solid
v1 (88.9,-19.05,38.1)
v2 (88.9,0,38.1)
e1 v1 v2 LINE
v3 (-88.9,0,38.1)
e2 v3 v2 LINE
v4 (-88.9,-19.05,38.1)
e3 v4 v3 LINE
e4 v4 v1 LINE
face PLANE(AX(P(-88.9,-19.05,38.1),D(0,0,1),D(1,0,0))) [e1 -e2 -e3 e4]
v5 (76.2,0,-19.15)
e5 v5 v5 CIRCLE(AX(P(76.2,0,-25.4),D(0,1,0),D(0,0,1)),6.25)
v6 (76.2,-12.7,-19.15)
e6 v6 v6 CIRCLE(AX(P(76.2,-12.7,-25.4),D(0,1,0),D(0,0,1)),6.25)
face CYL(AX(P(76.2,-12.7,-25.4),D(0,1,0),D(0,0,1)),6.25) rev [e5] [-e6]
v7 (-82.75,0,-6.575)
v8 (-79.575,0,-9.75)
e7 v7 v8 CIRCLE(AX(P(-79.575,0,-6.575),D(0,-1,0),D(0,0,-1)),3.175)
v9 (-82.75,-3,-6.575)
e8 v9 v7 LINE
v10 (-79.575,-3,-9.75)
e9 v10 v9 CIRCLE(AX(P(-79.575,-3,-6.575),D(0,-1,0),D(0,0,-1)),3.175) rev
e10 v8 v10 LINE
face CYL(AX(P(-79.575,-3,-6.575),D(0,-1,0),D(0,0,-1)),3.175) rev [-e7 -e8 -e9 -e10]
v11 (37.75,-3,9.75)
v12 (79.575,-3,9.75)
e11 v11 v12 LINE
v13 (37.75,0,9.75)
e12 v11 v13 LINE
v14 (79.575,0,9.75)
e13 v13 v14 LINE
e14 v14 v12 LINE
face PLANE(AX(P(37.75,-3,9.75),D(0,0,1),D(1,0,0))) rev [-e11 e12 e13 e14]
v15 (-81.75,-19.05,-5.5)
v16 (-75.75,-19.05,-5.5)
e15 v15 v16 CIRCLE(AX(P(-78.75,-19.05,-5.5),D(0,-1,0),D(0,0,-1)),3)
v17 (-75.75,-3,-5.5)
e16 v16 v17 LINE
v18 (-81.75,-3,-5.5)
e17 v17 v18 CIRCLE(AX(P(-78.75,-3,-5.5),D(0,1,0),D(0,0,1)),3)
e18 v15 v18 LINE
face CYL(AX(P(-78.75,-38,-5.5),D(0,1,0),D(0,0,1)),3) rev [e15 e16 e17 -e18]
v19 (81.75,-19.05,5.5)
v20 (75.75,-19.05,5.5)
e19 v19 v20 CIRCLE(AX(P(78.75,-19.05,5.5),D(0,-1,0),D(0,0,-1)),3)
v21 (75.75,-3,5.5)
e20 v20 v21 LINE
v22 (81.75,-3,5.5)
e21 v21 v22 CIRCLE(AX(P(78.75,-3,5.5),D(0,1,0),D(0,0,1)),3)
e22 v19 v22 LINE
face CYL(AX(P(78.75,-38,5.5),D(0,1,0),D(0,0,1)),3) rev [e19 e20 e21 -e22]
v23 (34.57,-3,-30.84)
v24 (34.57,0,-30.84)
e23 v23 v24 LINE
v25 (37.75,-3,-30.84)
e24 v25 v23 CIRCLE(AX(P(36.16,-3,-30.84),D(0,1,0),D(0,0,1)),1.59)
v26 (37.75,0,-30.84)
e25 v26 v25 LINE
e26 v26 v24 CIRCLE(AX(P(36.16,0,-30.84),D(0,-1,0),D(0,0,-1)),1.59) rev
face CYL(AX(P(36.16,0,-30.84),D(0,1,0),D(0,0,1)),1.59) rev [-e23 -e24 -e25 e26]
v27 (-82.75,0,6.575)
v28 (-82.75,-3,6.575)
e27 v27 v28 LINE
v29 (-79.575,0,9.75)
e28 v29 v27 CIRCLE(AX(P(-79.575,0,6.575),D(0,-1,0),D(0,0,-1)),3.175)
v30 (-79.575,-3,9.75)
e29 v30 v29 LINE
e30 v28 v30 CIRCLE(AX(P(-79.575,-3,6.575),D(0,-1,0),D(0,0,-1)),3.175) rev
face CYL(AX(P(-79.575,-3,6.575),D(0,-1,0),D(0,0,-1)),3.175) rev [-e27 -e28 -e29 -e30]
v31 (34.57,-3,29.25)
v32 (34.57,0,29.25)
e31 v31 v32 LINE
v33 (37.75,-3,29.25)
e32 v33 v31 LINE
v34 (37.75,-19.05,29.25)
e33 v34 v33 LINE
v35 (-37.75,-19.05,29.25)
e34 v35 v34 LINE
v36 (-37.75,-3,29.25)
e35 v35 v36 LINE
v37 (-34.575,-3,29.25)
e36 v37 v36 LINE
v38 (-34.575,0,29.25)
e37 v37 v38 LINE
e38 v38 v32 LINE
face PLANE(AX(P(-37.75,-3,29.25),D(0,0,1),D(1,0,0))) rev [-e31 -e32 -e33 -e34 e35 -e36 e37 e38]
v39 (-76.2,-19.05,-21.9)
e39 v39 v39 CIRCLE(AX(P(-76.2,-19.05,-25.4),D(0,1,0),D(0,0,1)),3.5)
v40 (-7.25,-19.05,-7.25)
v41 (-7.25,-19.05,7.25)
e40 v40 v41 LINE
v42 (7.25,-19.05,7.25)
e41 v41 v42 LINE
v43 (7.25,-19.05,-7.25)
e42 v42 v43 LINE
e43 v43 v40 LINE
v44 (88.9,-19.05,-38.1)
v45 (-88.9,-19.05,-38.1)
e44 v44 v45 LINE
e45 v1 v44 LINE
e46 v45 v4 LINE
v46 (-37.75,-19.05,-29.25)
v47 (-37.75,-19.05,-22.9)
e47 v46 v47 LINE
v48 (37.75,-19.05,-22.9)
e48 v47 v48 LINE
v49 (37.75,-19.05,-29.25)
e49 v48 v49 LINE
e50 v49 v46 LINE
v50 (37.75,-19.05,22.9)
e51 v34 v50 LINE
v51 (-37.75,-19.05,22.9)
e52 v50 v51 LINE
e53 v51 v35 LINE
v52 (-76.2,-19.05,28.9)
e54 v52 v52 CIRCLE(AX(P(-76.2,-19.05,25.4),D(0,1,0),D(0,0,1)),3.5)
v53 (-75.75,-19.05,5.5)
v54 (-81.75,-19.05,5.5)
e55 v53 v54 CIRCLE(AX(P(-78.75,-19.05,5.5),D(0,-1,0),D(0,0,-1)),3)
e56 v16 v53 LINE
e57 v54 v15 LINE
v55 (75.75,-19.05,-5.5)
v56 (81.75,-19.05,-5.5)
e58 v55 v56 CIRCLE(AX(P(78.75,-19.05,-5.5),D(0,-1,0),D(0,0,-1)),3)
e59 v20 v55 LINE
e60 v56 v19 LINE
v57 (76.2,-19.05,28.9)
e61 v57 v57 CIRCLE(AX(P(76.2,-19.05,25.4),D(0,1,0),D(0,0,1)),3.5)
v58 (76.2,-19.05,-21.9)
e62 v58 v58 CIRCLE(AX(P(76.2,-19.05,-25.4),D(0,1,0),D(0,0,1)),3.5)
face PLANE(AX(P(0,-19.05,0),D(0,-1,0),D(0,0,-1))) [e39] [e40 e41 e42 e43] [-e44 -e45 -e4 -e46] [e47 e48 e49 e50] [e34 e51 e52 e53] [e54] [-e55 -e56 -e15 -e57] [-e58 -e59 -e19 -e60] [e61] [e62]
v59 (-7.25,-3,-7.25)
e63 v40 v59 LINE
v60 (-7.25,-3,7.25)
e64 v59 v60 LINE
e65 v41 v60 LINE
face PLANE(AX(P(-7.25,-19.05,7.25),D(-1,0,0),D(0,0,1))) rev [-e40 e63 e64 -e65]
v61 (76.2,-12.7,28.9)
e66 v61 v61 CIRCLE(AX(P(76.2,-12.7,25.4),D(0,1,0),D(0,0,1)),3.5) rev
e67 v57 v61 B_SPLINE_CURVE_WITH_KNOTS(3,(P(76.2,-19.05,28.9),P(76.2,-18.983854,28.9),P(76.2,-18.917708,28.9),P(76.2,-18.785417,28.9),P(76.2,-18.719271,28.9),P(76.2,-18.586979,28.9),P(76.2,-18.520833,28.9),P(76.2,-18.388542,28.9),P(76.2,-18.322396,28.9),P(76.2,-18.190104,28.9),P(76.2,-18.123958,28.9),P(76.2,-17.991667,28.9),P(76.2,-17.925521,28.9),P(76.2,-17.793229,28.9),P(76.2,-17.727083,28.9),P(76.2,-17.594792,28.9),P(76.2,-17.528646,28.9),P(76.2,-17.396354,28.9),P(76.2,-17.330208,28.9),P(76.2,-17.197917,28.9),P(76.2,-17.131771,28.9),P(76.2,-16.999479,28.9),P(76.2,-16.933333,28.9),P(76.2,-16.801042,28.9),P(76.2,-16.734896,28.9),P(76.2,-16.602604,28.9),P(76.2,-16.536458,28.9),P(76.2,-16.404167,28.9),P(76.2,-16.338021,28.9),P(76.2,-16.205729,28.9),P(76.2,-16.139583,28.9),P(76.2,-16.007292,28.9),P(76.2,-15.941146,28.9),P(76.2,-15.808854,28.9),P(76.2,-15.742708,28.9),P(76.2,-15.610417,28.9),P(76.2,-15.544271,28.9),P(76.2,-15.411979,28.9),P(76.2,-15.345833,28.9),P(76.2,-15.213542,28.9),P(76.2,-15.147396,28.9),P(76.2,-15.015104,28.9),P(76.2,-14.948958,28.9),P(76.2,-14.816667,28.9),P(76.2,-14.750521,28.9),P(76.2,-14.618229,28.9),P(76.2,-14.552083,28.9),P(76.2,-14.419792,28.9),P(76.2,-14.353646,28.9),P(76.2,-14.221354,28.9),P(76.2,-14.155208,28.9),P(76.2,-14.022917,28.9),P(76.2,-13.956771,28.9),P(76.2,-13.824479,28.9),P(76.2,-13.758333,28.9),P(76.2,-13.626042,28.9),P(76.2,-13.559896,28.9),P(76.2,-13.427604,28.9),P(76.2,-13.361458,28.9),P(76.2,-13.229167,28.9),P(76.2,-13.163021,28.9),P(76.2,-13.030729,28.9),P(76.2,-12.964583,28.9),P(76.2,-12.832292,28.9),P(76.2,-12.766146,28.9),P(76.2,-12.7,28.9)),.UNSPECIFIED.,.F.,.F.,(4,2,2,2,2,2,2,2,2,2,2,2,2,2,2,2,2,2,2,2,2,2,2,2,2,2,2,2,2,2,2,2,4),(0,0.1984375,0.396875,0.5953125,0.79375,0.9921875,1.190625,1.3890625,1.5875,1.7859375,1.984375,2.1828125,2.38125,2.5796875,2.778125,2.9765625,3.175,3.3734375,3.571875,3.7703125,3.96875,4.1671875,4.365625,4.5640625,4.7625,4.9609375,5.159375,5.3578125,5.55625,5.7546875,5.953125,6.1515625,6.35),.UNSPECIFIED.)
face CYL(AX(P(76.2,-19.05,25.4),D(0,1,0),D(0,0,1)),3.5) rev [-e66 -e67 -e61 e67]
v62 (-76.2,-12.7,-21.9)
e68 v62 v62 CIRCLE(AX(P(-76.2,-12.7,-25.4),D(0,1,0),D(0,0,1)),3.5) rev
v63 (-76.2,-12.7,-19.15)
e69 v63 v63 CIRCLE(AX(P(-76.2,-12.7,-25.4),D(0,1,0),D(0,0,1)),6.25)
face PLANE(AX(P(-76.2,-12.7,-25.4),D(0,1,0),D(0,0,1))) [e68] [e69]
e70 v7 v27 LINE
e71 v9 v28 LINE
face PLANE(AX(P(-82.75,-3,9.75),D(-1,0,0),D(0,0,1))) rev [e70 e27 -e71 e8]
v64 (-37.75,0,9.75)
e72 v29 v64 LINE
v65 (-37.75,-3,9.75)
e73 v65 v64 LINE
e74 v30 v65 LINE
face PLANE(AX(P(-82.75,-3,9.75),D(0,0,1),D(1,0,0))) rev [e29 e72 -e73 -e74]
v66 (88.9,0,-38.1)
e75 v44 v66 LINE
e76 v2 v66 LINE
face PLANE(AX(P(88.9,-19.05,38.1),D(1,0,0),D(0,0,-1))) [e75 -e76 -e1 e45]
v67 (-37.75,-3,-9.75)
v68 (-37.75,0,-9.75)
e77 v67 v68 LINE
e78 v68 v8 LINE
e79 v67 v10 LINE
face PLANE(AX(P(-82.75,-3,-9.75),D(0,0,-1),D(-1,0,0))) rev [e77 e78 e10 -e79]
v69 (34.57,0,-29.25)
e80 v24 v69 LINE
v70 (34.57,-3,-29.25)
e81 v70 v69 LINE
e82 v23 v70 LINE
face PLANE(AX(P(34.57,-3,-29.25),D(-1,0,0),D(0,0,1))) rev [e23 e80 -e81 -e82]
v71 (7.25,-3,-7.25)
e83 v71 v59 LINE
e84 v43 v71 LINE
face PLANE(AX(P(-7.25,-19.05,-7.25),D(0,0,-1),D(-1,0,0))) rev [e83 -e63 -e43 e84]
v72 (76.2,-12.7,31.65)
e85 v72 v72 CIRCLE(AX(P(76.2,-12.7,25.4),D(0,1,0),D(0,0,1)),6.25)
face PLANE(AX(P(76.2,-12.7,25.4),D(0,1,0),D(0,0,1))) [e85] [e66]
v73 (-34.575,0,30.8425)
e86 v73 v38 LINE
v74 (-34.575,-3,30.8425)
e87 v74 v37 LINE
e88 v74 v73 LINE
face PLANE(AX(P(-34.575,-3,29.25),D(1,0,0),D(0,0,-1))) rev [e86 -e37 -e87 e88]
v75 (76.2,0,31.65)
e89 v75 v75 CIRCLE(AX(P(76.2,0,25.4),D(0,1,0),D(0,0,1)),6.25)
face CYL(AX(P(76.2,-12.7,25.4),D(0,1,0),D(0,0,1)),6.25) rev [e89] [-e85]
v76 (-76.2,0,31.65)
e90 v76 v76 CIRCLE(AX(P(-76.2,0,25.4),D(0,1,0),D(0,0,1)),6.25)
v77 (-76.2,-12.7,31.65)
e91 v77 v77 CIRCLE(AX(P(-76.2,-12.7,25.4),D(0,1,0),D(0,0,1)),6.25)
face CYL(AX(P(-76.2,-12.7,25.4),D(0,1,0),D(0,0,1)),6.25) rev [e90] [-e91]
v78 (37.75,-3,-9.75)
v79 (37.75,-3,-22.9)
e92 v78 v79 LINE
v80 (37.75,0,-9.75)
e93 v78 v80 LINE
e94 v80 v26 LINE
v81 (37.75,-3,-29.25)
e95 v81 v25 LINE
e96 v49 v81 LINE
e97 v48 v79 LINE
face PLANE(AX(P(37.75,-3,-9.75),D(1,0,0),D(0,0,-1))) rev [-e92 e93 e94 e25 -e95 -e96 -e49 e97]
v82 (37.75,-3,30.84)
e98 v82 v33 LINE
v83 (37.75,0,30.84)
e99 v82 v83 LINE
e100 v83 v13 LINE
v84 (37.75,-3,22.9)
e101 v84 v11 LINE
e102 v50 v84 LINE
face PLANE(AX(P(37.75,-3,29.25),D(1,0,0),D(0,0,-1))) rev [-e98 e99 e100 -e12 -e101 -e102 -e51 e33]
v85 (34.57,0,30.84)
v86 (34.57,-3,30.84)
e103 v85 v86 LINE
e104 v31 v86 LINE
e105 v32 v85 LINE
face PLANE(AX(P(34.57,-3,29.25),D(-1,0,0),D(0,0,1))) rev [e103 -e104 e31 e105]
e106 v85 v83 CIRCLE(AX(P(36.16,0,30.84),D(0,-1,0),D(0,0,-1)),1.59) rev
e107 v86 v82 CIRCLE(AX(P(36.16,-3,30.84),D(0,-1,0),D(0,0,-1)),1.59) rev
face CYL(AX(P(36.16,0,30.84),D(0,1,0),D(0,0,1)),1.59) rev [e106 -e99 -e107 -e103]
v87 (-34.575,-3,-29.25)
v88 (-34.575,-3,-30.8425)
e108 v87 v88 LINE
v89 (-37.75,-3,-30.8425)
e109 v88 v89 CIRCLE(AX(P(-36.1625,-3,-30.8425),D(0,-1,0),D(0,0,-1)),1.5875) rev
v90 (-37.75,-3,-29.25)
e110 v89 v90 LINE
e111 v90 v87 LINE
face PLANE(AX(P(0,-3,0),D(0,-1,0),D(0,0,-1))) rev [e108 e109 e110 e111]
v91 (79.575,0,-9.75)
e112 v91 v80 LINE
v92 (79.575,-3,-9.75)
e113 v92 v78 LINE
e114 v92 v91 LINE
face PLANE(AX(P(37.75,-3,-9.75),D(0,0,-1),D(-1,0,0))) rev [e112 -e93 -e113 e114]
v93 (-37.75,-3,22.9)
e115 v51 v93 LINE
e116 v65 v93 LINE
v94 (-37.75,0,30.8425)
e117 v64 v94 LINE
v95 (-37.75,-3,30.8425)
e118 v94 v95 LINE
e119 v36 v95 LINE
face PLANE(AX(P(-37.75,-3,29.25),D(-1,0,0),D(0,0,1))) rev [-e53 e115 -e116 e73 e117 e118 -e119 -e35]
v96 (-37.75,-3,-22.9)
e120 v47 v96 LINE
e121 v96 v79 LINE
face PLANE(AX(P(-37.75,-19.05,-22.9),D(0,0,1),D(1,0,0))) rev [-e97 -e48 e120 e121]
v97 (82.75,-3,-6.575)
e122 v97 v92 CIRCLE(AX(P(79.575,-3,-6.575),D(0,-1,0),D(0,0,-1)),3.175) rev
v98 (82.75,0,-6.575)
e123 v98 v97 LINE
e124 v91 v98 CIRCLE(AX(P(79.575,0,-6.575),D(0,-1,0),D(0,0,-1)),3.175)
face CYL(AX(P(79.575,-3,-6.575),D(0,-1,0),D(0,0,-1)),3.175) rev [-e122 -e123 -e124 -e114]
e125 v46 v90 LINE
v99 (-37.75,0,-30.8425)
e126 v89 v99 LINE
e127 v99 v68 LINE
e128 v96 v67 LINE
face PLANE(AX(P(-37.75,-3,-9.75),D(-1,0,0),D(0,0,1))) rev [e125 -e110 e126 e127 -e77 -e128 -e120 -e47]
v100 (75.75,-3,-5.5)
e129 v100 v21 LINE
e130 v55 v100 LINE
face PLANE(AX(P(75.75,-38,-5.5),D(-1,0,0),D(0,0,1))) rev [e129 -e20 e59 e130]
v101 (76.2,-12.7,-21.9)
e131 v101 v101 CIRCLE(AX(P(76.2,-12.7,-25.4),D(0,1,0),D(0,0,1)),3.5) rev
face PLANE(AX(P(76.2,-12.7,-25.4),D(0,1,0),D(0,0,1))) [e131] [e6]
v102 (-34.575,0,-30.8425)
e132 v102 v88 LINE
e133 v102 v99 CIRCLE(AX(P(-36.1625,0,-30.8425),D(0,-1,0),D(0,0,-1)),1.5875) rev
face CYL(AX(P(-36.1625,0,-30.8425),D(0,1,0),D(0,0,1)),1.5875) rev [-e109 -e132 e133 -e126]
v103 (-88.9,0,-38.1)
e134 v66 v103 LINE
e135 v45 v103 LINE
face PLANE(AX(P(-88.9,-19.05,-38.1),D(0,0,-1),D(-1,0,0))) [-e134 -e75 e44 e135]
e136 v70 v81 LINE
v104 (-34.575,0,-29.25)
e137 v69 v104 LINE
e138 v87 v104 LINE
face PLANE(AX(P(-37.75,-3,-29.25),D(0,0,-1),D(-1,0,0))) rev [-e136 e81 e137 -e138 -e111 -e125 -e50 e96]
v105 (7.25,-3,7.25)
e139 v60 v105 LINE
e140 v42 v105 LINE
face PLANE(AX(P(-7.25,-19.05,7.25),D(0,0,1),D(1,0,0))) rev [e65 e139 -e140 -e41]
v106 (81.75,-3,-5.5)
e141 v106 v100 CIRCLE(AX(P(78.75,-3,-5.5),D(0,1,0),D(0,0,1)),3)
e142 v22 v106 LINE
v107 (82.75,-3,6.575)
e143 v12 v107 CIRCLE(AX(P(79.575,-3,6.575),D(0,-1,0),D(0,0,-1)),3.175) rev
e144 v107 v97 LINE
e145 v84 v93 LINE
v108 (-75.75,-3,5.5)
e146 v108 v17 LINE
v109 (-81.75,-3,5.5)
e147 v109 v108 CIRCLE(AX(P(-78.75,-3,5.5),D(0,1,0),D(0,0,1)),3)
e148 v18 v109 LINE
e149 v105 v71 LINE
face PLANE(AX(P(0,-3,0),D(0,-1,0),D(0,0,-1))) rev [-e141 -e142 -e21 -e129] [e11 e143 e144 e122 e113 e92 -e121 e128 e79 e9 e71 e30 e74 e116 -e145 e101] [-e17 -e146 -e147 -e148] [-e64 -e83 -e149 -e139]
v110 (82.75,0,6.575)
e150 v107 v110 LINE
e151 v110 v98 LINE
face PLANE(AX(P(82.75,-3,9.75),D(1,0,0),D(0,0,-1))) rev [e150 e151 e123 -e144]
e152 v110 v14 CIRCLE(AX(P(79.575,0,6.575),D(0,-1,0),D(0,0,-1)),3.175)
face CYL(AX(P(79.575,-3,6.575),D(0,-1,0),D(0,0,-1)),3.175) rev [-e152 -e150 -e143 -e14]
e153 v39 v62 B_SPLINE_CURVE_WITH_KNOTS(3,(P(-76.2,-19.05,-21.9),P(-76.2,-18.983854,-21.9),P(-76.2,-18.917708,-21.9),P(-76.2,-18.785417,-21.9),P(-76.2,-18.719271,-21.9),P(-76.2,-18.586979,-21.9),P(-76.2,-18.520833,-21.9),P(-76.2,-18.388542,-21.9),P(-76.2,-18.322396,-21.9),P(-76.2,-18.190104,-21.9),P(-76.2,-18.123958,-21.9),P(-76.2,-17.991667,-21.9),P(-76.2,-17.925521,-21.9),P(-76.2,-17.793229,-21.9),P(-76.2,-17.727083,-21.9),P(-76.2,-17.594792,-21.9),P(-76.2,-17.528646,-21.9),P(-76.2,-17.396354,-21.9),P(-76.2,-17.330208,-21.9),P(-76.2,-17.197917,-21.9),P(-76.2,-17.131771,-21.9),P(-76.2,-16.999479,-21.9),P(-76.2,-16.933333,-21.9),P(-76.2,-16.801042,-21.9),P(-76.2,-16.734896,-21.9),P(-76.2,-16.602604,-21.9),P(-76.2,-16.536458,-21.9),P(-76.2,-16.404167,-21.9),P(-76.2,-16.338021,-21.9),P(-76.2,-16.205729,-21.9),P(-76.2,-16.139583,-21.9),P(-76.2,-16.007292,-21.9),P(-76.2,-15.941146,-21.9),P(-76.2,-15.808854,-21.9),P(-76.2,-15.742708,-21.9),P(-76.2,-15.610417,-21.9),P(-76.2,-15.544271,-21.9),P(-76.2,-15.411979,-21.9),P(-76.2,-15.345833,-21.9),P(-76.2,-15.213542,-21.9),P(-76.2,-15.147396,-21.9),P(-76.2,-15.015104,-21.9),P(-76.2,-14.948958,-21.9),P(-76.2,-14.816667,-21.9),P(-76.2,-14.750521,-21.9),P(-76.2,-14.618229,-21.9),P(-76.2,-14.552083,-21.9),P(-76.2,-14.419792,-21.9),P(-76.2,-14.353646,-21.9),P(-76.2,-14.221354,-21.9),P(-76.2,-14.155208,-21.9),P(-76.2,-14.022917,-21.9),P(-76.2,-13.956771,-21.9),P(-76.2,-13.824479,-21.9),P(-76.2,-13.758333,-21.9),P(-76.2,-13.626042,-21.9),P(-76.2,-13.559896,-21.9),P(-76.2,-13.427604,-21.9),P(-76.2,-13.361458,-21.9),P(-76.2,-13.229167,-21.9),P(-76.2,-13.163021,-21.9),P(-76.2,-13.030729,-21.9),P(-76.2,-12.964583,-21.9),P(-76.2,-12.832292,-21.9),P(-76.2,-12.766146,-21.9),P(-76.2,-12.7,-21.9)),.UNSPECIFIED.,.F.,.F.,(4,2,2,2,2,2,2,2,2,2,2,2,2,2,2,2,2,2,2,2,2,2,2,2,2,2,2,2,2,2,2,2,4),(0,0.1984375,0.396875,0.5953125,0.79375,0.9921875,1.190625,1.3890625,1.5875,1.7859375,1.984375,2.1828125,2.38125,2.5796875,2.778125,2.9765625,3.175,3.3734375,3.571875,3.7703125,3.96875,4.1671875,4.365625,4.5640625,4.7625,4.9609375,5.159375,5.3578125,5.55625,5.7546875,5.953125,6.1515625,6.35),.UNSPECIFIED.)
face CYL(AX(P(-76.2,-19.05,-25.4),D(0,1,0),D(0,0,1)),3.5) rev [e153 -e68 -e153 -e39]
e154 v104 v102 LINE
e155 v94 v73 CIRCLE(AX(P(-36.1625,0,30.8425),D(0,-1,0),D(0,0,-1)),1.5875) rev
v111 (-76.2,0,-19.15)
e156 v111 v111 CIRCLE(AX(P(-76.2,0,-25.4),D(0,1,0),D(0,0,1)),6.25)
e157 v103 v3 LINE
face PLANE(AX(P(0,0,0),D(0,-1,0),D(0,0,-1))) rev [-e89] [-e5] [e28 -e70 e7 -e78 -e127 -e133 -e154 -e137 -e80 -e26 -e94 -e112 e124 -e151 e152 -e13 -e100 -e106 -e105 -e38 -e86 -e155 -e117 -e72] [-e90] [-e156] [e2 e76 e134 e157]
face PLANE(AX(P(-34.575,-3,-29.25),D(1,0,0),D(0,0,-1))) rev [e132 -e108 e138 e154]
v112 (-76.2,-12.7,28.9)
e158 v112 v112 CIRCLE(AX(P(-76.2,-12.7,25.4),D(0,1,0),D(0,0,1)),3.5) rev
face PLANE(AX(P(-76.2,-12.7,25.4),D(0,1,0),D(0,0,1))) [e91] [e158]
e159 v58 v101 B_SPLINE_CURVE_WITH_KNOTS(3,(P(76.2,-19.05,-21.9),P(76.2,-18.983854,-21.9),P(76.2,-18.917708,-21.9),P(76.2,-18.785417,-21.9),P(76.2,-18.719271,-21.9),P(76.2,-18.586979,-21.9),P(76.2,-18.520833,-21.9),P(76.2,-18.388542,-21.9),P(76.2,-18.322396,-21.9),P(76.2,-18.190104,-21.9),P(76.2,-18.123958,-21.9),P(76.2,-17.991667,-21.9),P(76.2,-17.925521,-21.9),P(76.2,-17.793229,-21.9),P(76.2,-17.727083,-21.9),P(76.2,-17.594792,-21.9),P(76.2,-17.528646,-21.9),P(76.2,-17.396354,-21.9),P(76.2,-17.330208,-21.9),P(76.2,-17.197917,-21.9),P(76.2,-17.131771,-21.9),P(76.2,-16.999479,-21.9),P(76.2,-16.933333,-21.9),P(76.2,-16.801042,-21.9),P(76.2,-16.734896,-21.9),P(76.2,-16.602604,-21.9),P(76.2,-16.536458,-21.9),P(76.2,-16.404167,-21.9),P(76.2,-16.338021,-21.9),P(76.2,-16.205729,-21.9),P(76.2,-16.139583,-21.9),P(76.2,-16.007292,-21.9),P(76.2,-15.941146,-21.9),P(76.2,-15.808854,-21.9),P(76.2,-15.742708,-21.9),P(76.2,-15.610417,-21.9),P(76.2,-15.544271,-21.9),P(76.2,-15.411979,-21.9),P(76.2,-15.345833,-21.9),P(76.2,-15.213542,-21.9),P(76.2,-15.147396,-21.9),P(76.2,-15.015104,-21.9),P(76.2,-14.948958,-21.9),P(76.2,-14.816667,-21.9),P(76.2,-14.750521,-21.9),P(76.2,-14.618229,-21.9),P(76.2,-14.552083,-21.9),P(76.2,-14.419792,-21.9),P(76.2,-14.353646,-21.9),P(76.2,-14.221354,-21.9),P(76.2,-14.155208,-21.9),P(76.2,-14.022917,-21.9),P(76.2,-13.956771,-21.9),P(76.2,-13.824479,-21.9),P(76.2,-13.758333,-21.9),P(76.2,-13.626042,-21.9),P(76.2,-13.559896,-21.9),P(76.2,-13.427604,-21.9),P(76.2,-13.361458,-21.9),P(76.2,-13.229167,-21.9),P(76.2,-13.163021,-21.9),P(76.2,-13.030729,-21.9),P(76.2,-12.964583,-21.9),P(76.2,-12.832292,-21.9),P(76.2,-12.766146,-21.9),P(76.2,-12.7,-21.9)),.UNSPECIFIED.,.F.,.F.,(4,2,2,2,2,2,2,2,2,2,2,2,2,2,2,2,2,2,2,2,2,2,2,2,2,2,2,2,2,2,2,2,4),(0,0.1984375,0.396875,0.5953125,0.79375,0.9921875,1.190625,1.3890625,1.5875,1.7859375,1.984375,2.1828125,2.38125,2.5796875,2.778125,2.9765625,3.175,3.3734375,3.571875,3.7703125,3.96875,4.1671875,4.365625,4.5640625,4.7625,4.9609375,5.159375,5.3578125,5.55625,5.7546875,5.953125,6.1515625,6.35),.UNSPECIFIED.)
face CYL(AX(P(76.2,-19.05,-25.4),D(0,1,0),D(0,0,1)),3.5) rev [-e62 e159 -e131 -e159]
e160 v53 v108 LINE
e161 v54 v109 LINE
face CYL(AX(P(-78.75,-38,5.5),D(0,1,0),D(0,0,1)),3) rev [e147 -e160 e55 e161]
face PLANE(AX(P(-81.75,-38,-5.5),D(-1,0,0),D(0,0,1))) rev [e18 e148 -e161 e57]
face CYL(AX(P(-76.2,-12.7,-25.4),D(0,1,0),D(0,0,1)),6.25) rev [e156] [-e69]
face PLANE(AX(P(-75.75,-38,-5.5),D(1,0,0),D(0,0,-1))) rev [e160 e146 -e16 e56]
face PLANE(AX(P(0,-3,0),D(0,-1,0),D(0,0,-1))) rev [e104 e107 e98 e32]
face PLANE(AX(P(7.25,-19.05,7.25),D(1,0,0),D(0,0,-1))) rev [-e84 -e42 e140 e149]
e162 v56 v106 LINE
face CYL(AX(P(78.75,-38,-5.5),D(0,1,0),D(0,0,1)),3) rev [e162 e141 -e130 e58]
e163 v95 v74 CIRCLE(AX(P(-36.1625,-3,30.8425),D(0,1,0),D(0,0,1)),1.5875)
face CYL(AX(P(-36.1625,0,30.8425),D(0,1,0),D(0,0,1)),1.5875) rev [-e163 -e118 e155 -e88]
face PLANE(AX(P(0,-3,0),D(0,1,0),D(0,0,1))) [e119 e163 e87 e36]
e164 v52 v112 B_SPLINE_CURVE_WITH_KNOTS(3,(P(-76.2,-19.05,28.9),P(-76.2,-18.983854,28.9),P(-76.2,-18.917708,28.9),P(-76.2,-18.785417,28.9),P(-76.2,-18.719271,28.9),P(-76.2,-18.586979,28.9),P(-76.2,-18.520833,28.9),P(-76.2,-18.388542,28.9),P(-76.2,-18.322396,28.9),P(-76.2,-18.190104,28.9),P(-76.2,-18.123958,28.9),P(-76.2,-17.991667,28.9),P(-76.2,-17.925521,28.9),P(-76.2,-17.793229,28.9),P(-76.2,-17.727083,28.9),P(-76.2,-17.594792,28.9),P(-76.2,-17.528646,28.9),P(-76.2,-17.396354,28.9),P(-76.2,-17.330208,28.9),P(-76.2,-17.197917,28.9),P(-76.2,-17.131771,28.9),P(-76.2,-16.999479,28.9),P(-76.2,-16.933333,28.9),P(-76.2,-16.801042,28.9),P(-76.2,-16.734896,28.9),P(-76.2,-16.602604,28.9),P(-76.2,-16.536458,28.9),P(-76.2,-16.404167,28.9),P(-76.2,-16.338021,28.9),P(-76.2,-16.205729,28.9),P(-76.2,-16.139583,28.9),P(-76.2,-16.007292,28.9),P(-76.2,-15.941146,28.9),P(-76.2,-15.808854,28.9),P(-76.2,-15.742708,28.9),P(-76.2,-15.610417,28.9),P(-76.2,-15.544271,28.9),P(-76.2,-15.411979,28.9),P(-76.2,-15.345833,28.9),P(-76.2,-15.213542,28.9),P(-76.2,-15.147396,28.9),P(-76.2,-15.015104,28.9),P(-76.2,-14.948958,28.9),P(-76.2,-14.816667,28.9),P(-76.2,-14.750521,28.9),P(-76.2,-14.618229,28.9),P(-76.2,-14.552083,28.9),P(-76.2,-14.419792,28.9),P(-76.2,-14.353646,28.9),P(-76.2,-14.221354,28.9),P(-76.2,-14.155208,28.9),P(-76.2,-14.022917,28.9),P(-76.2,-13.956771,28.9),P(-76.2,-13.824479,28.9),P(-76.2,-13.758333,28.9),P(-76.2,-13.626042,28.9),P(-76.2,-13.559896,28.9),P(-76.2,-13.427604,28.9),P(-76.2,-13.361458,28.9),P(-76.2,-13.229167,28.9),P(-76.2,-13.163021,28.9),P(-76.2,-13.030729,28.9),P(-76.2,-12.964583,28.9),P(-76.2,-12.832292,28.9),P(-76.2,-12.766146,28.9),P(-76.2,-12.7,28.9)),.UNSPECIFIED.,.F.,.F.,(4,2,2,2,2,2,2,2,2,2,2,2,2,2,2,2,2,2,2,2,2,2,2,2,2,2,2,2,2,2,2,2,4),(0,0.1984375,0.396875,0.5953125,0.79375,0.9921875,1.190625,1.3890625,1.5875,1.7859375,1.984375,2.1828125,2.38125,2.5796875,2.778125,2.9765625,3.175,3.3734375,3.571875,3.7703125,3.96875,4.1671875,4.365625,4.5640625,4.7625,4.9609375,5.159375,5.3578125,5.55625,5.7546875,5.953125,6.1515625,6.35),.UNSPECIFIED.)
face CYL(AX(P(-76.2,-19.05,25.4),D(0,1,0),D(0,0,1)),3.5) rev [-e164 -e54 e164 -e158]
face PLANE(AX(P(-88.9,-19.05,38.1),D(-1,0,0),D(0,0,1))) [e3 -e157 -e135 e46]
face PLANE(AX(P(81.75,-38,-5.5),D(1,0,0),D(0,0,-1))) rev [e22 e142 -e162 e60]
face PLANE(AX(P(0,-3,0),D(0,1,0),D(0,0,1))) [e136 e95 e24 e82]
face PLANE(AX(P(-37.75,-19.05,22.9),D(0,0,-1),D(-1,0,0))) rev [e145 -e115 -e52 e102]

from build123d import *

# Parameters (mm, degrees)
SKETCH1_W           = 177.8
SKETCH1_H           = 76.2
BOSS_EXTRUDE1_DEPTH = 19.05
CUT_EXTRUDE1_DEPTH  = 3
SKETCH3_W           = 14.5
SKETCH3_H           = 14.5
SKETCH3_W_2         = 75.5
SKETCH3_H_2         = 6.35
CUT_EXTRUDE2_DEPTH  = 99.042962522
SKETCH4_R           = 3.5
CUT_EXTRUDE3_DEPTH  = 99.578509321
FILLET1_R           = 3.175
SKETCH5_R           = 6.25
CUT_EXTRUDE4_DEPTH  = 12.7
SKETCH6_W           = 3.175
SKETCH6_H           = 3.18
SKETCH6_W_2         = 3.18
CUT_EXTRUDE5_DEPTH  = 3
FILLET2_R           = 1.5875
FILLET3_R           = 1.59
FILLET4_R           = 1.5875
FILLET5_R           = 1.59
CUT_EXTRUDE6_DEPTH  = 35
CUT_EXTRUDE7_DEPTH  = 35


with BuildPart() as part:
    # Sketch1 → Boss-Extrude1 (new body)
    with BuildSketch(Plane(origin=(0, 0, 0), x_dir=(1, 0, 0), z_dir=(0, 1, 0))):
        Rectangle(SKETCH1_W, SKETCH1_H)
    extrude(amount=-BOSS_EXTRUDE1_DEPTH)

    # Sketch2 → Cut-Extrude1 (cut)
    with BuildSketch(Plane(origin=(0, 0, 0), x_dir=(1, 0, 0), z_dir=(0, 1, 0))):
        Polygon((37.75, 9.75), (82.75, 9.75), (82.75, -9.75), (37.75, -9.75), (37.75, -29.25), (-37.75, -29.25), (-37.75, -9.75), (-82.75, -9.75), (-82.75, 9.75), (-37.75, 9.75), (-37.75, 29.25), (37.75, 29.25), align=None)
    extrude(amount=-CUT_EXTRUDE1_DEPTH, mode=Mode.SUBTRACT)

    # Sketch3 → Cut-Extrude2 (cut, through all)
    with BuildSketch(Plane(origin=(0, -3, 0), x_dir=(1, 0, 0), z_dir=(0, 1, 0))):
        Rectangle(SKETCH3_W, SKETCH3_H)
        with Locations((0, 26.075)):
            Rectangle(SKETCH3_W_2, SKETCH3_H_2)
        with Locations((0, -26.075)):
            Rectangle(SKETCH3_W_2, SKETCH3_H_2)
    extrude(amount=-CUT_EXTRUDE2_DEPTH, mode=Mode.SUBTRACT)

    # Sketch4 → Cut-Extrude3 (cut, through all)
    with BuildSketch(Plane(origin=(0, 0, 0), x_dir=(1, 0, 0), z_dir=(0, 1, 0))):
        with Locations(Location((-76.2, 25.4, 0), (0, 0, 270))):
            Circle(SKETCH4_R)
        with Locations(Location((76.2, 25.4, 0), (0, 0, 270))):
            Circle(SKETCH4_R)
        with Locations(Location((76.2, -25.4, 0), (0, 0, 270))):
            Circle(SKETCH4_R)
        with Locations(Location((-76.2, -25.4, 0), (0, 0, 270))):
            Circle(SKETCH4_R)
    extrude(amount=-CUT_EXTRUDE3_DEPTH, mode=Mode.SUBTRACT)

    # Fillet1
    fillet1_edges = [part.edges().sort_by_distance(p)[0] for p in [
        (82.75, -1.5, -9.75),
        (82.75, -1.5, 9.75),
        (-82.75, -1.5, 9.75),
        (-82.75, -1.5, -9.75),
    ]]
    fillet(fillet1_edges, radius=FILLET1_R)

    # Sketch5 → Cut-Extrude4 (cut)
    with BuildSketch(Plane(origin=(0, 0, 0), x_dir=(1, 0, 0), z_dir=(0, 1, 0))):
        with Locations(Location((-76.2, -25.4, 0), (0, 0, 270))):
            Circle(SKETCH5_R)
        with Locations(Location((-76.2, 25.4, 0), (0, 0, 270))):
            Circle(SKETCH5_R)
        with Locations(Location((76.2, 25.4, 0), (0, 0, 270))):
            Circle(SKETCH5_R)
        with Locations(Location((76.2, -25.4, 0), (0, 0, 270))):
            Circle(SKETCH5_R)
    extrude(amount=-CUT_EXTRUDE4_DEPTH, mode=Mode.SUBTRACT)

    # Sketch6 → Cut-Extrude5 (cut)
    with BuildSketch(Plane(origin=(0, 0, 0), x_dir=(1, 0, 0), z_dir=(0, 1, 0))):
        with Locations((-36.1625, 30.84)):
            Rectangle(SKETCH6_W, SKETCH6_H)
        with Locations((36.16, 30.84)):
            Rectangle(SKETCH6_W_2, SKETCH6_H)
        with Locations((36.16, -30.84)):
            Rectangle(SKETCH6_W_2, SKETCH6_H)
        with Locations((-36.1625, -30.84)):
            Rectangle(SKETCH6_W, SKETCH6_H)
    extrude(amount=-CUT_EXTRUDE5_DEPTH, mode=Mode.SUBTRACT)

    # Fillet2
    fillet2_edges = [part.edges().sort_by_distance(p)[0] for p in [
        (-37.75, -1.5, -32.43),
        (-34.575, -1.5, -32.43),
    ]]
    fillet(fillet2_edges, radius=FILLET2_R - 0.0001)  # a hair under: the kernel refuses the full size

    # Fillet3
    fillet3_edges = [part.edges().sort_by_distance(p)[0] for p in [
        (37.75, -1.5, -32.43),
        (34.57, -1.5, -32.43),
    ]]
    fillet(fillet3_edges, radius=FILLET3_R - 0.0001)  # a hair under: the kernel refuses the full size

    # Fillet4
    fillet4_edges = [part.edges().sort_by_distance(p)[0] for p in [
        (-37.75, -1.5, 32.43),
        (-34.575, -1.5, 32.43),
    ]]
    fillet(fillet4_edges, radius=FILLET4_R - 0.0001)  # a hair under: the kernel refuses the full size

    # Fillet5
    fillet5_edges = [part.edges().sort_by_distance(p)[0] for p in [
        (37.75, -1.5, 32.43),
        (34.57, -1.5, 32.43),
    ]]
    fillet(fillet5_edges, radius=FILLET5_R - 0.0001)  # a hair under: the kernel refuses the full size

    # Sketch8 → Cut-Extrude6 (cut)
    with BuildSketch(Plane(origin=(0, -3, 0), x_dir=(1, 0, 0), z_dir=(0, 1, 0))):
        with BuildLine():
            Line((-75.75, 5.5), (-75.75, -5.5))
            ThreePointArc((-75.75, -5.5), (-78.75, -8.5), (-81.75, -5.5))
            Line((-81.75, -5.5), (-81.75, 5.5))
            ThreePointArc((-81.75, 5.5), (-78.75, 8.5), (-75.75, 5.5))
        make_face()
    extrude(amount=-CUT_EXTRUDE6_DEPTH, mode=Mode.SUBTRACT)

    # Sketch9 → Cut-Extrude7 (cut)
    with BuildSketch(Plane(origin=(0, -3, 0), x_dir=(1, 0, 0), z_dir=(0, 1, 0))):
        with BuildLine():
            Line((81.75, 5.5), (81.75, -5.5))
            ThreePointArc((81.75, -5.5), (78.75, -8.5), (75.75, -5.5))
            Line((75.75, -5.5), (75.75, 5.5))
            ThreePointArc((75.75, 5.5), (78.75, 8.5), (81.75, 5.5))
        make_face()
    extrude(amount=-CUT_EXTRUDE7_DEPTH, mode=Mode.SUBTRACT)


solid = part.part
